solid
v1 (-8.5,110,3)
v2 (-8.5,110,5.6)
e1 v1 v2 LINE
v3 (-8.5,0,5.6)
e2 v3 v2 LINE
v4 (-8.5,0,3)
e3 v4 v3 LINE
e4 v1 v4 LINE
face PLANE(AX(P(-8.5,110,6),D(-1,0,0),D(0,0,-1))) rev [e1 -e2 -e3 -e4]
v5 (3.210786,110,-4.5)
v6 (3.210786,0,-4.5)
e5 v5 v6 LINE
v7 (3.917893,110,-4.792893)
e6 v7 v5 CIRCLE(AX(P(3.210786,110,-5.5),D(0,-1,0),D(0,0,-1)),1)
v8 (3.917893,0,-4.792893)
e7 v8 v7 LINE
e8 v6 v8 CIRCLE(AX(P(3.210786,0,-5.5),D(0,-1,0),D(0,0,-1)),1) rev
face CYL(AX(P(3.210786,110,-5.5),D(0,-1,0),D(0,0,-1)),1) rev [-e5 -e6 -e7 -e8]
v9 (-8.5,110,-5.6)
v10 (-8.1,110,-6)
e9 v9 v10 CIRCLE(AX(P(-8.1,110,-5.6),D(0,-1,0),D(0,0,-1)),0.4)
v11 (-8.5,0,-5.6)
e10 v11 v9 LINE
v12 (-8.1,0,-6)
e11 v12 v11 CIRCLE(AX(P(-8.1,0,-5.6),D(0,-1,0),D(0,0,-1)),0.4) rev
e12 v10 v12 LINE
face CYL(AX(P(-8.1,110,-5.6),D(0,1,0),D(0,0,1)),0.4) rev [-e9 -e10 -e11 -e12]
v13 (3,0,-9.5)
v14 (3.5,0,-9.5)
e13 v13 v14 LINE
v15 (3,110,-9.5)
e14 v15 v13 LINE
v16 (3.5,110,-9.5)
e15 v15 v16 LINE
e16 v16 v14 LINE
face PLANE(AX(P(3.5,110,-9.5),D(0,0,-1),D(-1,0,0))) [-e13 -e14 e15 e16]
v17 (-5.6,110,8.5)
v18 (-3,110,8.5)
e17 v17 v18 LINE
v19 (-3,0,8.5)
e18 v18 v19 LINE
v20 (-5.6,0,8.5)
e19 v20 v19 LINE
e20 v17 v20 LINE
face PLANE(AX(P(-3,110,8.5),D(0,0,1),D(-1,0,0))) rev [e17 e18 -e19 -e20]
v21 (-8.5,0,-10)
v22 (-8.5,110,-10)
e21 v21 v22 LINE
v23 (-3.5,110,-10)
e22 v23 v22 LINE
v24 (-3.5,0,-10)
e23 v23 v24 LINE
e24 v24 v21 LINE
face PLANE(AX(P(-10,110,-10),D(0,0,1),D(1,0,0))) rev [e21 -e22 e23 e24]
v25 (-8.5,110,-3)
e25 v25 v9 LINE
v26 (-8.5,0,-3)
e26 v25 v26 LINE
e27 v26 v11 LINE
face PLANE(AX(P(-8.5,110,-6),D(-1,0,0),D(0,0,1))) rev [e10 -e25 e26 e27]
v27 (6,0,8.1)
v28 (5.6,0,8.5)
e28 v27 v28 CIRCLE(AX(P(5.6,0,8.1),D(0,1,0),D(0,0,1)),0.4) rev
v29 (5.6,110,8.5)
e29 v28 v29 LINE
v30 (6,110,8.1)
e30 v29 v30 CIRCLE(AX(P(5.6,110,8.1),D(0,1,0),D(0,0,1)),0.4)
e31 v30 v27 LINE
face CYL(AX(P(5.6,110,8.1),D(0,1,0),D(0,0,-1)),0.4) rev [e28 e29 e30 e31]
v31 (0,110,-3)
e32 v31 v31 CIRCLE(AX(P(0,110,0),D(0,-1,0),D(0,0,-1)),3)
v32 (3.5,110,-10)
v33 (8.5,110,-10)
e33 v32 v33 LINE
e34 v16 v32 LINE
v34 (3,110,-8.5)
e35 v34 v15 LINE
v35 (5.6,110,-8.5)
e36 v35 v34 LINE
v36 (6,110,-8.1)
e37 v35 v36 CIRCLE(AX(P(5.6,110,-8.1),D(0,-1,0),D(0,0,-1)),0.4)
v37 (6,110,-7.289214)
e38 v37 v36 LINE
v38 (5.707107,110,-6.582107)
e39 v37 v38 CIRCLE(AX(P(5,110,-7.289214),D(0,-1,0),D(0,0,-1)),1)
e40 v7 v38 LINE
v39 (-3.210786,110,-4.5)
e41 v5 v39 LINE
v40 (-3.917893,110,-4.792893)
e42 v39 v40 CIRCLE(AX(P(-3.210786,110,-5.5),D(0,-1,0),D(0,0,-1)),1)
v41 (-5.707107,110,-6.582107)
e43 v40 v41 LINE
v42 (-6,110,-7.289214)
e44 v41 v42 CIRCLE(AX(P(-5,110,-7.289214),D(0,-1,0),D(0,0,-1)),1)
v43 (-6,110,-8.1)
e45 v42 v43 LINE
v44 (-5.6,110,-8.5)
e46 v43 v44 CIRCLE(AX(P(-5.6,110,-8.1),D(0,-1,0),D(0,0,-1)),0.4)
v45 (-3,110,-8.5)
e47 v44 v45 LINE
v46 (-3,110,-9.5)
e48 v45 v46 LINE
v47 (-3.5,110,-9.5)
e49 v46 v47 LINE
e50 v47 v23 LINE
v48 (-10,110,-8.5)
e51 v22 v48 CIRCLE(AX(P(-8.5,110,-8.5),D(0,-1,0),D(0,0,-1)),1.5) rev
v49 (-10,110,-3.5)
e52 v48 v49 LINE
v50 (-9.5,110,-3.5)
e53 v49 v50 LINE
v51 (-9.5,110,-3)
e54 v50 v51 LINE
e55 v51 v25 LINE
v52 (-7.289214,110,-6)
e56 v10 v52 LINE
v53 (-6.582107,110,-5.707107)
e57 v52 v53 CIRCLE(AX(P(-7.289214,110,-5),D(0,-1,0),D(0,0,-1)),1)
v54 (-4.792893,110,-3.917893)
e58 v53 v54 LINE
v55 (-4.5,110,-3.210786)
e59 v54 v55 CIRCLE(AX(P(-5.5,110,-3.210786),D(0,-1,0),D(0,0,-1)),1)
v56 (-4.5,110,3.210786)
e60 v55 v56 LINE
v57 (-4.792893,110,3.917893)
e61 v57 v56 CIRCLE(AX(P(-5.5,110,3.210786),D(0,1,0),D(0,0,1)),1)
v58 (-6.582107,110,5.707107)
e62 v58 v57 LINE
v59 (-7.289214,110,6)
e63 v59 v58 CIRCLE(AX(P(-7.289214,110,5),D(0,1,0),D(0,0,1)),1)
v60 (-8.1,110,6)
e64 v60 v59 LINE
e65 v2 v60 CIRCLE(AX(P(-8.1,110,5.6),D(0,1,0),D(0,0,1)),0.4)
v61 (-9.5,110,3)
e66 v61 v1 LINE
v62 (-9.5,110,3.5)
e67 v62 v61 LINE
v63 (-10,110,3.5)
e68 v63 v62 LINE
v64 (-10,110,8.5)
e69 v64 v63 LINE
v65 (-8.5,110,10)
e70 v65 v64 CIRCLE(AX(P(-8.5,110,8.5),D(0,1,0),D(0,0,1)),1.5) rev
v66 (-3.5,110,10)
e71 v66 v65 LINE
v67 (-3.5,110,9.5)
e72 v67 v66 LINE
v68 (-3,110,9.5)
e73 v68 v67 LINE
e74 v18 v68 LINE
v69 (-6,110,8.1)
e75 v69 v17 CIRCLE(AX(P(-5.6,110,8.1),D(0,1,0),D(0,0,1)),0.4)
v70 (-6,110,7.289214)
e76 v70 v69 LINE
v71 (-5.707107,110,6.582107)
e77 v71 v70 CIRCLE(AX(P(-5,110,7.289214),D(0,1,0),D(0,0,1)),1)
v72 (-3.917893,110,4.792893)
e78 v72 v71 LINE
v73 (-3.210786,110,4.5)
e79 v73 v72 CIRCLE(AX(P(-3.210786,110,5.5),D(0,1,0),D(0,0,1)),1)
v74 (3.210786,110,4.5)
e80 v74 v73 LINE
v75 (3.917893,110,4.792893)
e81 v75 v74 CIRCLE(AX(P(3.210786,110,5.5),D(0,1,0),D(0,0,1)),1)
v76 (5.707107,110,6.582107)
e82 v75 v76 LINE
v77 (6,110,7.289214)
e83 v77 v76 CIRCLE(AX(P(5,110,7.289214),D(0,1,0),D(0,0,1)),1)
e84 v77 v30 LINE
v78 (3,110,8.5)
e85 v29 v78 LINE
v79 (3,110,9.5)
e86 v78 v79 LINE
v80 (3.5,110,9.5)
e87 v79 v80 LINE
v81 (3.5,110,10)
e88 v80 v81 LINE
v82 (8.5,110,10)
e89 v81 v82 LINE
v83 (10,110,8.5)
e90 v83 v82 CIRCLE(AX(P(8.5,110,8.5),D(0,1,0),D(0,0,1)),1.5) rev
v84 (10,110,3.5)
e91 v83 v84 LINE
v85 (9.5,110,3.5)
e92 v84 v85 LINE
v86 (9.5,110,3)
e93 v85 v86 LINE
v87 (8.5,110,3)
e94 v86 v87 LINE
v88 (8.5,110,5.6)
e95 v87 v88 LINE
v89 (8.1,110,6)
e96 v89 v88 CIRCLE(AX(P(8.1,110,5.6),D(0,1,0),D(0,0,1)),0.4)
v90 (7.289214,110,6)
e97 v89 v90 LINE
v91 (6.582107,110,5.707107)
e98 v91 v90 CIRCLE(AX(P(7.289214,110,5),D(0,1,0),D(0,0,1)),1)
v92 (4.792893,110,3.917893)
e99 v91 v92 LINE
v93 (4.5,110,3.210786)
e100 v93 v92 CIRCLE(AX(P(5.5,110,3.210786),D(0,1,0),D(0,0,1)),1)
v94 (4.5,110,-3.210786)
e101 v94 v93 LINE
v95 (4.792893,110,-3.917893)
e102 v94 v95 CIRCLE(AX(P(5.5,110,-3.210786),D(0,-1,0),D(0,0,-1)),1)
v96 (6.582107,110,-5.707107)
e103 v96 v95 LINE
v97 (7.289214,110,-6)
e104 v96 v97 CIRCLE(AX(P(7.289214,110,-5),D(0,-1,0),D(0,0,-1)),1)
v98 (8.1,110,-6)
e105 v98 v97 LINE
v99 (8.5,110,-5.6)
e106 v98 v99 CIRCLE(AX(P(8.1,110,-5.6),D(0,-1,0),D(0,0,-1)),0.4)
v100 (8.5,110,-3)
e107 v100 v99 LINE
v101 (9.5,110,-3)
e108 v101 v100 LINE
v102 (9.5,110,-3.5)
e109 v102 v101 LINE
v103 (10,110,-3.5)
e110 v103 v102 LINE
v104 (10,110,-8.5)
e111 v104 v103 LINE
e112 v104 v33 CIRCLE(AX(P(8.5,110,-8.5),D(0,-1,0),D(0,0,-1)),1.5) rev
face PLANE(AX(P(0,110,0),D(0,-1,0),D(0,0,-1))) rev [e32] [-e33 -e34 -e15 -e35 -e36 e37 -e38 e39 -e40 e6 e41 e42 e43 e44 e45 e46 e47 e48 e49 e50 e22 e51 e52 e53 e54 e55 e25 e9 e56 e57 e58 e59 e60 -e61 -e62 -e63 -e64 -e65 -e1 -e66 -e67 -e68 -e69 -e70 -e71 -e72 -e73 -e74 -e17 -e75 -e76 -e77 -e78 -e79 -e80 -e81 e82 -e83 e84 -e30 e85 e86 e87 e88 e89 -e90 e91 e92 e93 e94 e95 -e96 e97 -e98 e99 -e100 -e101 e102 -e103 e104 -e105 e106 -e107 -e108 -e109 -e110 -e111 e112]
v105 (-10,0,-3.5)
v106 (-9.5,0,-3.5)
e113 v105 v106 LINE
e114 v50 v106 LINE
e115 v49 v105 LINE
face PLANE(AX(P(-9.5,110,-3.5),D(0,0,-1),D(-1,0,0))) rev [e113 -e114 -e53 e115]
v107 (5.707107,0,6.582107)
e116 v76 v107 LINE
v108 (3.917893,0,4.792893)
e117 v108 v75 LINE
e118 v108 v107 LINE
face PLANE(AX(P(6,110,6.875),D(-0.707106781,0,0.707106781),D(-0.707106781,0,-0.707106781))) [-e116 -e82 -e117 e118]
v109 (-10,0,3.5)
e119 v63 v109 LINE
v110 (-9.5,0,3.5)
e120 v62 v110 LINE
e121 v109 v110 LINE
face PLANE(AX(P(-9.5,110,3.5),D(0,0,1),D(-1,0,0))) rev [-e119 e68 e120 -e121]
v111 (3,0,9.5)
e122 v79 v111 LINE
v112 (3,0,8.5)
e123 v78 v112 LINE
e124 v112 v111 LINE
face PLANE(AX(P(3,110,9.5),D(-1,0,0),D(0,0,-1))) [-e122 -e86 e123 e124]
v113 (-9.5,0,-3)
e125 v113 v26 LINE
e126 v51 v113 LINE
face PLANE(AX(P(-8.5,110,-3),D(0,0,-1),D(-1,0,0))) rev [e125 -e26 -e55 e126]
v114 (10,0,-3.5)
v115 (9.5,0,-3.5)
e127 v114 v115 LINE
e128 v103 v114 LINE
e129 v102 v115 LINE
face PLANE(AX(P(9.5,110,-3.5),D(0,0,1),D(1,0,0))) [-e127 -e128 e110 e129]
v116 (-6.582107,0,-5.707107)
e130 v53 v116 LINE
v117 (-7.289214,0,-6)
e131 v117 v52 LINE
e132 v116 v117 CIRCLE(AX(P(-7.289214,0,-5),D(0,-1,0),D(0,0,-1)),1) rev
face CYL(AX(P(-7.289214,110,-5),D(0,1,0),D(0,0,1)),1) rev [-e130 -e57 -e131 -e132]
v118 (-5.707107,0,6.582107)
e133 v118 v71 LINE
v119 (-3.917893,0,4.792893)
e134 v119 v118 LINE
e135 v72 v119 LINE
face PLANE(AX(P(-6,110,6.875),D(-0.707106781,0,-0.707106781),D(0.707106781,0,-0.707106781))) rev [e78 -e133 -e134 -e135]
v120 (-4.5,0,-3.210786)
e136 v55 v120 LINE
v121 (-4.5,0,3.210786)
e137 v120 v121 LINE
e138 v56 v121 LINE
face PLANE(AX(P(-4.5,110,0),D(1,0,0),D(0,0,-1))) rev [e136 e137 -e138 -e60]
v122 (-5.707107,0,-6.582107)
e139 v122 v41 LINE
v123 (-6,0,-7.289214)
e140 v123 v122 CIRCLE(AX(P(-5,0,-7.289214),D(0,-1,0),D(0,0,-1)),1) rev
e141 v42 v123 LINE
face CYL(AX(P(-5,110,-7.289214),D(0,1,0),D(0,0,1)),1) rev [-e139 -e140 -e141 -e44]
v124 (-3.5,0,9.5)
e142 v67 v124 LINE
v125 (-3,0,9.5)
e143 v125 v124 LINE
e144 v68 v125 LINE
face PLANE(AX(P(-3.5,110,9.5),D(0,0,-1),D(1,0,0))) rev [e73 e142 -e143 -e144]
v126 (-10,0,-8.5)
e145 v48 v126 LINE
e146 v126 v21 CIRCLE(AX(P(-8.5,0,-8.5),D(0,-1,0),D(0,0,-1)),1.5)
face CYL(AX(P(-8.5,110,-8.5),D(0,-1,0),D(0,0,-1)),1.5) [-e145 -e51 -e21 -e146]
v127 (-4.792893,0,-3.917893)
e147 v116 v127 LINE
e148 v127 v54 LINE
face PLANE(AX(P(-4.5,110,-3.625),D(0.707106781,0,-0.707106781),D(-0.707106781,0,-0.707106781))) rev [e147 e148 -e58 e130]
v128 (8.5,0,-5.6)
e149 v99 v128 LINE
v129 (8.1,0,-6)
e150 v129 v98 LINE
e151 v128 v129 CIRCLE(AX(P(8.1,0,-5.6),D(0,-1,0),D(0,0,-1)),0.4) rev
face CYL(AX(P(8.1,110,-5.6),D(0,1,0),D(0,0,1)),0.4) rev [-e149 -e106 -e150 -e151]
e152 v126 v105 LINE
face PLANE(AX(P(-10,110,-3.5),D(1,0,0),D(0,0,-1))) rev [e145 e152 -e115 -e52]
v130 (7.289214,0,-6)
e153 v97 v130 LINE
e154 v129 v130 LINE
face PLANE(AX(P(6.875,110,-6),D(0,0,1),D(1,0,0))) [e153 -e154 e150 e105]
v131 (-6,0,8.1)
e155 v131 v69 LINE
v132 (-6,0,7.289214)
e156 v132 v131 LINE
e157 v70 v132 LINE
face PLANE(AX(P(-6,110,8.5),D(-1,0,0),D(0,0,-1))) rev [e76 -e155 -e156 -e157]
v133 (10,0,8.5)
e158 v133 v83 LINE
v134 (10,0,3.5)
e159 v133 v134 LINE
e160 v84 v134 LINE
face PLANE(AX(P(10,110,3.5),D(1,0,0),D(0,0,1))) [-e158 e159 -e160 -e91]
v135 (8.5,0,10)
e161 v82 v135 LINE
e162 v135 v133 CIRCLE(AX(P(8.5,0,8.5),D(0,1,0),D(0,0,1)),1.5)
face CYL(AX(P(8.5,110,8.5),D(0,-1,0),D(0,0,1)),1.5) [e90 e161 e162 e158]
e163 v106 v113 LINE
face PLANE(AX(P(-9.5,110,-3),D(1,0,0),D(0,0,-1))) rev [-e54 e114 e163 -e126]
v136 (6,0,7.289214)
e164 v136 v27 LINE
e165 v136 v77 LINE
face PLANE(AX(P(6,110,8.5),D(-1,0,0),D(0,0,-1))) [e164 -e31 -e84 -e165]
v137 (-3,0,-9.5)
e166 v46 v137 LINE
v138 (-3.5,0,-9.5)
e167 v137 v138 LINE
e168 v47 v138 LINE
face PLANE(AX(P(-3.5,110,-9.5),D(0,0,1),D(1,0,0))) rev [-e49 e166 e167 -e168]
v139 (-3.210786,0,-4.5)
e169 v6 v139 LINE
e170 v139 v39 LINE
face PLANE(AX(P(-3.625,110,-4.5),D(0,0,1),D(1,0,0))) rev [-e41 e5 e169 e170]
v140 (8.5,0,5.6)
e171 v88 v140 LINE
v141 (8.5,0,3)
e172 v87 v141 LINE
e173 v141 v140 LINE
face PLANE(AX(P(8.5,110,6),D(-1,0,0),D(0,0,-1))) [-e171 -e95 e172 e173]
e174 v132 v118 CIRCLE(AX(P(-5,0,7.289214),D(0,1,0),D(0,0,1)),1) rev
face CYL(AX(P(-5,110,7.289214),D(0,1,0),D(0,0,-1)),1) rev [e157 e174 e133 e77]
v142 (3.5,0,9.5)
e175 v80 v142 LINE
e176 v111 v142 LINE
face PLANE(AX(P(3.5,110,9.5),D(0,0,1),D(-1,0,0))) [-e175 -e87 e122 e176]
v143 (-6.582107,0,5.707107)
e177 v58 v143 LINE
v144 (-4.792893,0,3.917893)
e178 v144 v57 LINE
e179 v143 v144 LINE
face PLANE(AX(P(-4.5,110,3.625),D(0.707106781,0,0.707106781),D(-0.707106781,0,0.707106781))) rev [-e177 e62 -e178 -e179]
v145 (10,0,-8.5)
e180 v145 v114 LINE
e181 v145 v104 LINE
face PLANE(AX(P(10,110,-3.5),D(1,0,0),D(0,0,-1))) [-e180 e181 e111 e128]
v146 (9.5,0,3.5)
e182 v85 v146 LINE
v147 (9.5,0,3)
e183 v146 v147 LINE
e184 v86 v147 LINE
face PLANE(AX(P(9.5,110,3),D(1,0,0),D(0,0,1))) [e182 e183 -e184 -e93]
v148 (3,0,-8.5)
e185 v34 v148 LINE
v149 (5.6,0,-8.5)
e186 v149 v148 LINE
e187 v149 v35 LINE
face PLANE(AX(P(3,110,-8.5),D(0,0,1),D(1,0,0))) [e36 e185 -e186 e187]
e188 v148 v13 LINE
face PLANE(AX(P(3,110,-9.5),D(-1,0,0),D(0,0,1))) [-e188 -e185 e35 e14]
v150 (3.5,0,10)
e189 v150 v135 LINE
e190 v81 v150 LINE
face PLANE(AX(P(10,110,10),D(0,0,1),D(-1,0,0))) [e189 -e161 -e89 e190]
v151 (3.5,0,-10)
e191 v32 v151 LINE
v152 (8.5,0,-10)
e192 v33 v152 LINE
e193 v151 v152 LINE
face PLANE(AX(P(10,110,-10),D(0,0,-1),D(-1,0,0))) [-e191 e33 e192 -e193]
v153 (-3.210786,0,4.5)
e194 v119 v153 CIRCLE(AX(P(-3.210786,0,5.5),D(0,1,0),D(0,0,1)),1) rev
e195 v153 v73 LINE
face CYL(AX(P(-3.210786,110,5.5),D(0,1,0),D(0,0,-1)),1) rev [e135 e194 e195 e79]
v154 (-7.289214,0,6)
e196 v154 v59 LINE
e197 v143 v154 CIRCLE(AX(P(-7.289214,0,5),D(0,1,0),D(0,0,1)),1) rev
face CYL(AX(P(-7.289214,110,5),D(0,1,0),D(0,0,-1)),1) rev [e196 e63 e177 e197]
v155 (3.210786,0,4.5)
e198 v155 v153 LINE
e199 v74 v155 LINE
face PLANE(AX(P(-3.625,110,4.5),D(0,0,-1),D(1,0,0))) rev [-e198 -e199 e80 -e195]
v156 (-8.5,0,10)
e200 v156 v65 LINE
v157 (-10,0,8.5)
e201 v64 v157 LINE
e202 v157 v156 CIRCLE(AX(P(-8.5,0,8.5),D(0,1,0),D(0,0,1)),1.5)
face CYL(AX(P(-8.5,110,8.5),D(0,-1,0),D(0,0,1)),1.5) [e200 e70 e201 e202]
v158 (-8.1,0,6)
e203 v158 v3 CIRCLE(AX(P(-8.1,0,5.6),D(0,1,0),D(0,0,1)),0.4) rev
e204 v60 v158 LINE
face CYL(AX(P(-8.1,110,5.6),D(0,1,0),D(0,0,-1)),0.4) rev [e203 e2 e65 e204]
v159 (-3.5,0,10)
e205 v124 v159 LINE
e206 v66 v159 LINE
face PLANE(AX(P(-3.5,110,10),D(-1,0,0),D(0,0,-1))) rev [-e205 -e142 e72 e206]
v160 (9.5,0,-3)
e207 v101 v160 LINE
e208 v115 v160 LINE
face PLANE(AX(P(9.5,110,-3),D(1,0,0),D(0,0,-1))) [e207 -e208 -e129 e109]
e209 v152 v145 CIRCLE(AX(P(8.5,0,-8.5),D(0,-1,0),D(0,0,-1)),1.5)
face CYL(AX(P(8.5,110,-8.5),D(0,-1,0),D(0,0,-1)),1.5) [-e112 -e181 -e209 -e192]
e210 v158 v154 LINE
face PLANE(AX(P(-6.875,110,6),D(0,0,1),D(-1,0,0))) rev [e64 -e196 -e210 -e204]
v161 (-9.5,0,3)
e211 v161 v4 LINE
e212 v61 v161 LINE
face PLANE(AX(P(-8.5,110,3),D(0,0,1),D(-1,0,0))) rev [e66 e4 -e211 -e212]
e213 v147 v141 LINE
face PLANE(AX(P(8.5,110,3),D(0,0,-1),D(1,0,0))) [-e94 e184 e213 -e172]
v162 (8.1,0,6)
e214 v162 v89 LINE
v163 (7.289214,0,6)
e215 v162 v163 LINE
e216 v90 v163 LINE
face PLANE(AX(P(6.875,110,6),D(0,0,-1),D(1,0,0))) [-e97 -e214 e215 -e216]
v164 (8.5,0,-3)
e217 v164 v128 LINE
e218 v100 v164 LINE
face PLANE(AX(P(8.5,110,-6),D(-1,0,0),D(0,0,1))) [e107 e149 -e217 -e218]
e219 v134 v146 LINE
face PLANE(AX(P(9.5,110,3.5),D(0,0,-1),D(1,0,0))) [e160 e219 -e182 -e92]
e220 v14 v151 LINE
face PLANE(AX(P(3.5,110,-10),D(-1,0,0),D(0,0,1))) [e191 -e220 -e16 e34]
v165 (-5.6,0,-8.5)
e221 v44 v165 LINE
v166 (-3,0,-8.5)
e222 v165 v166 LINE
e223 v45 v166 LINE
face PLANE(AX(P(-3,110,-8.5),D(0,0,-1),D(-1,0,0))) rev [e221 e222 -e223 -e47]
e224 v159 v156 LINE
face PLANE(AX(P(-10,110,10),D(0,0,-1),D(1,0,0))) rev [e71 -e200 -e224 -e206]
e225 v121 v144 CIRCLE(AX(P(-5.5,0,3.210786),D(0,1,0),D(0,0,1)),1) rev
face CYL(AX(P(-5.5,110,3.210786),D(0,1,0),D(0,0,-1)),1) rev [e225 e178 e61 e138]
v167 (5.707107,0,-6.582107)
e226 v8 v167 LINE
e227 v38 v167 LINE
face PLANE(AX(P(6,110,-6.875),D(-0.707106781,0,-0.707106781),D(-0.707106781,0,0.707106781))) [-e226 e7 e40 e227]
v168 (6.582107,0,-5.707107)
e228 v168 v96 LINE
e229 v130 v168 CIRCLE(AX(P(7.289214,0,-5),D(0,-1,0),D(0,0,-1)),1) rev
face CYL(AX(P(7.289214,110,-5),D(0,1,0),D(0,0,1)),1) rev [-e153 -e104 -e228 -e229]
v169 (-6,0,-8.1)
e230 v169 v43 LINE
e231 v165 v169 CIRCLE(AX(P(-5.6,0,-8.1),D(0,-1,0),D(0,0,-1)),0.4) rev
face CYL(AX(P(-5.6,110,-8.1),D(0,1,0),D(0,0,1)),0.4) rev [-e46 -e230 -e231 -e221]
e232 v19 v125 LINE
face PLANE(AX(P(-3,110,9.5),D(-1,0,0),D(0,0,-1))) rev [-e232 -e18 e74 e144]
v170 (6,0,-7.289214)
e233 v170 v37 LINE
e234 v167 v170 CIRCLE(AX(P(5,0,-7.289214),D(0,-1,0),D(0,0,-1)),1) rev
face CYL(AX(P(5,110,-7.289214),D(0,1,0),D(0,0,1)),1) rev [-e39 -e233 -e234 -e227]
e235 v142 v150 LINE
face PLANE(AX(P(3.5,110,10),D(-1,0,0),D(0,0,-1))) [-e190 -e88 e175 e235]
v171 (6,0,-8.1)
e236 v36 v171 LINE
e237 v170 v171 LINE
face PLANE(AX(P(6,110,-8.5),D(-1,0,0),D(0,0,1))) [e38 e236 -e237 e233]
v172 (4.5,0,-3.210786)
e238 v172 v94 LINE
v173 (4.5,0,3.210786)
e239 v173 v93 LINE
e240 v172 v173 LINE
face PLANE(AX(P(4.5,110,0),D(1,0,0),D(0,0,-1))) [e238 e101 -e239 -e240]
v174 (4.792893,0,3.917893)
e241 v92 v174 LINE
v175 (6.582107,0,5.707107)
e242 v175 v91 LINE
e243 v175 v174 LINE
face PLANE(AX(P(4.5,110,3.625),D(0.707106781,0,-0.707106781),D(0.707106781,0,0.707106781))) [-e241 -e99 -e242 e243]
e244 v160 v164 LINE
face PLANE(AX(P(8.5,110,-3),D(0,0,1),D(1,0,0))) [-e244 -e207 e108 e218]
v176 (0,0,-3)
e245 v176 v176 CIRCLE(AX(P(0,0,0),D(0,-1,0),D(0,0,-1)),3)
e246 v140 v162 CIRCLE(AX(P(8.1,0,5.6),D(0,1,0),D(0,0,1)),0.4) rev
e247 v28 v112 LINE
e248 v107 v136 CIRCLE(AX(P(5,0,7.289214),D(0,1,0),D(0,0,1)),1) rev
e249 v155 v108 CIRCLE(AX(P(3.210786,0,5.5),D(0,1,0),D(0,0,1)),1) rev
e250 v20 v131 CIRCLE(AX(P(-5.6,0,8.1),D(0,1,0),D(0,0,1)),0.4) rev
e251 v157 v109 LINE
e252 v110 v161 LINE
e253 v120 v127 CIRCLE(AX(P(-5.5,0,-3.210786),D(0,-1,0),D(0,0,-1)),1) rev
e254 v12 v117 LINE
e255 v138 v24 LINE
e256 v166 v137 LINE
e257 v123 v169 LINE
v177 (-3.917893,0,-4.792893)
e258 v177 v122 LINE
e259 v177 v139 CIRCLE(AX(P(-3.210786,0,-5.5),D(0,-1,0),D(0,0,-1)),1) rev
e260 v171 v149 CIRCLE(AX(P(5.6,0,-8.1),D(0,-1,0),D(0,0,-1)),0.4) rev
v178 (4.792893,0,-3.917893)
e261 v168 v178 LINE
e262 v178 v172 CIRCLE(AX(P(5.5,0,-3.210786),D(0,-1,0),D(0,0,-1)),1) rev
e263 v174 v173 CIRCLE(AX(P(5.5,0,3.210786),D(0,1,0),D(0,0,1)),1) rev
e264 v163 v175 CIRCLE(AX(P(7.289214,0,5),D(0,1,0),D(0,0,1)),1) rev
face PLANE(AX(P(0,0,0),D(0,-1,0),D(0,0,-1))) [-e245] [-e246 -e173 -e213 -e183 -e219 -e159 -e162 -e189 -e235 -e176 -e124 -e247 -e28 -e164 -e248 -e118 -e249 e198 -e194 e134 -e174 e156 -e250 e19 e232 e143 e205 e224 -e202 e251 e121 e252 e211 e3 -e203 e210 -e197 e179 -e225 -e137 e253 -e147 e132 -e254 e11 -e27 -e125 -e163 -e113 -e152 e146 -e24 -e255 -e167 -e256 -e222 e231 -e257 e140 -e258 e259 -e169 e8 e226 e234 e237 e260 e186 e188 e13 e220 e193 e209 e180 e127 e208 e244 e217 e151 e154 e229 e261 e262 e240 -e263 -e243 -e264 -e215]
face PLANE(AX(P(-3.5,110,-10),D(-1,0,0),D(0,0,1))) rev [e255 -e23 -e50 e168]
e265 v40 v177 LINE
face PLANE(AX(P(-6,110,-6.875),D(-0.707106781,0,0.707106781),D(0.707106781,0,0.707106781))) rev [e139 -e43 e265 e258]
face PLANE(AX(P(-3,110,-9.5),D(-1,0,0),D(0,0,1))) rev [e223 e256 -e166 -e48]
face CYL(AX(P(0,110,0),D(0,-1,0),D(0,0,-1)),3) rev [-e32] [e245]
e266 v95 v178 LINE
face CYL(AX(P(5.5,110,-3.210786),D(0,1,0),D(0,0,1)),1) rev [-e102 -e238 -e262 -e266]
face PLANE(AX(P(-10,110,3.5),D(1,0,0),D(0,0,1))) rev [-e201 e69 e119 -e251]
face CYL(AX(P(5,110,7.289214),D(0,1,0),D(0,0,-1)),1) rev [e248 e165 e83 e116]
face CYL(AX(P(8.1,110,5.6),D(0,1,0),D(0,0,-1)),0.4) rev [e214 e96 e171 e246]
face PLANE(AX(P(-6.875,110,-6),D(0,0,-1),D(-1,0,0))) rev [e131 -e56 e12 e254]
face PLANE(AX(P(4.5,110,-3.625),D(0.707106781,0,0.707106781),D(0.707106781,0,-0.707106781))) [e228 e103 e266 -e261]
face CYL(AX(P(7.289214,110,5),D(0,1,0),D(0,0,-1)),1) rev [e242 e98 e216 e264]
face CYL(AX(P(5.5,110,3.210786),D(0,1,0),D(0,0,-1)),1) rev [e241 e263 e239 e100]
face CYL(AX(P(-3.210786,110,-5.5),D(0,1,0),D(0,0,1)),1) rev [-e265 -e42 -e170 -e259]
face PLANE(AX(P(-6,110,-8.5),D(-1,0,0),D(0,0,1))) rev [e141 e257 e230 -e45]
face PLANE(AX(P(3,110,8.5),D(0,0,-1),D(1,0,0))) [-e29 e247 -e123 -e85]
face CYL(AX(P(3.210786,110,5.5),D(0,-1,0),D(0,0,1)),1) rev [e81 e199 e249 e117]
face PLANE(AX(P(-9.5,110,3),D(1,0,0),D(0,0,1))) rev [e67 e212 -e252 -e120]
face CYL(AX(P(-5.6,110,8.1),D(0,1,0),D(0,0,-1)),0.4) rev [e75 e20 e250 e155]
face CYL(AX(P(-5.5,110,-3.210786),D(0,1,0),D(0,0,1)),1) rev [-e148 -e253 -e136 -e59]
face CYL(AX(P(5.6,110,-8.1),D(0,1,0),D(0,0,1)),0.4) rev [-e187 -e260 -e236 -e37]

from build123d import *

# Parameters (mm, degrees)
BOSS_EXTRU_1_CORPS_DEPTH    = 110
CONG_1_R                    = 1.5
CONG_2_R                    = 0.4
CONG_4_R                    = 1
CONG_1_OF_SYM_TRIE_BRAS_R   = 1.5
CONG_2_OF_SYM_TRIE_BRAS_R   = 0.4
CONG_4_OF_SYM_TRIE_BRAS_R   = 1
SYM_TRIE_BRAS_DOUBLE_DEPTH  = 110
APR_S_TARODAGE_M6_R         = 3
ENL_V_MAT_FILETAGE_M6_DEPTH = 111.905365064


# Read off the part's stored shape, not the designer's step: Symétrie Bras double
with BuildPart() as part:
    # Esquisse4 → Boss.-Extru.1 Corps (new body)
    with BuildSketch(Plane(origin=(0, 0, 0), x_dir=(1, 0, 0), z_dir=(0, 1, 0))):
        Polygon((0, 0), (-4.5, 0), (-4.5, 3.625), (-6.875, 6), (-8.5, 6), (-8.5, 3), (-9.5, 3), (-9.5, 3.5), (-10, 3.5), (-10, 10), (-3.5, 10), (-3.5, 9.5), (-3, 9.5), (-3, 8.5), (-6, 8.5), (-6, 6.875), (-3.625, 4.5), (0, 4.5), align=None)
    boss_extru_1_corps = extrude(amount=BOSS_EXTRU_1_CORPS_DEPTH)

    # Congé1
    cong_1_edges = [part.edges().sort_by_distance(p)[0] for p in [
        (-10, 55, -10),
    ]]
    fillet(cong_1_edges, radius=CONG_1_R)

    # Congé2
    cong_2_edges = [part.edges().sort_by_distance(p)[0] for p in [
        (-8.5, 55, -6),
        (-6, 55, -8.5),
    ]]
    fillet(cong_2_edges, radius=CONG_2_R)

    # Congé4
    cong_4_edges = [part.edges().sort_by_distance(p)[0] for p in [
        (-4.5, 55, -3.625),
        (-6.875, 55, -6),
        (-6, 55, -6.875),
        (-3.625, 55, -4.5),
    ]]
    fillet(cong_4_edges, radius=CONG_4_R)

    # Symétrie Bras: Boss.-Extru.1 Corps across plane
    add(boss_extru_1_corps.mirror(Plane(origin=(0, 110, -4.5), x_dir=(0, 0, 1), z_dir=(-1, 0, 0))))

    # Congé1 of Symétrie Bras
    cong_1_of_sym_trie_bras_edges = [part.edges().sort_by_distance(p)[0] for p in [
        (10, 55, -10),
    ]]
    fillet(cong_1_of_sym_trie_bras_edges, radius=CONG_1_OF_SYM_TRIE_BRAS_R)

    # Congé2 of Symétrie Bras
    cong_2_of_sym_trie_bras_edges = [part.edges().sort_by_distance(p)[0] for p in [
        (8.5, 55, -6),
        (6, 55, -8.5),
    ]]
    fillet(cong_2_of_sym_trie_bras_edges, radius=CONG_2_OF_SYM_TRIE_BRAS_R)

    # Congé4 of Symétrie Bras
    cong_4_of_sym_trie_bras_edges = [part.edges().sort_by_distance(p)[0] for p in [
        (4.5, 55, -3.625),
        (6.875, 55, -6),
        (6, 55, -6.875),
        (3.625, 55, -4.5),
    ]]
    fillet(cong_4_of_sym_trie_bras_edges, radius=CONG_4_OF_SYM_TRIE_BRAS_R)

    # Symétrie Bras double outline → Symétrie Bras double (add)
    with BuildSketch(Plane(origin=(0, 0, 0), x_dir=(1, 0, 0), z_dir=(0, 1, 0))):
        with BuildLine():
            ThreePointArc((7.289213562, -6), (6.90653013, -5.923879533), (6.582106781, -5.707106781))
            Line((6.582106781, -5.707106781), (4.792893219, -3.917893219))
            ThreePointArc((4.792893219, -3.917893219), (4.576120467, -3.59346987), (4.5, -3.210786438))
            Line((4.5, -3.210786438), (4.5, 0))
            Line((4.5, 0), (-4.5, 0))
            Line((-4.5, 0), (-4.5, -3.210786438))
            ThreePointArc((-4.5, -3.210786438), (-4.576120467, -3.59346987), (-4.792893219, -3.917893219))
            Line((-4.792893219, -3.917893219), (-6.582106781, -5.707106781))
            ThreePointArc((-6.582106781, -5.707106781), (-6.90653013, -5.923879533), (-7.289213562, -6))
            Line((-7.289213562, -6), (-8.1, -6))
            ThreePointArc((-8.1, -6), (-8.382842712, -5.882842712), (-8.5, -5.6))
            Line((-8.5, -5.6), (-8.5, -3))
            Line((-8.5, -3), (-9.5, -3))
            Line((-9.5, -3), (-9.5, -3.5))
            Line((-9.5, -3.5), (-10, -3.5))
            Line((-10, -3.5), (-10, -8.5))
            ThreePointArc((-10, -8.5), (-9.560660172, -9.560660172), (-8.5, -10))
            Line((-8.5, -10), (-3.5, -10))
            Line((-3.5, -10), (-3.5, -9.5))
            Line((-3.5, -9.5), (-3, -9.5))
            Line((-3, -9.5), (-3, -8.5))
            Line((-3, -8.5), (-5.6, -8.5))
            ThreePointArc((-5.6, -8.5), (-5.882842712, -8.382842712), (-6, -8.1))
            Line((-6, -8.1), (-6, -7.289213562))
            ThreePointArc((-6, -7.289213562), (-5.923879533, -6.90653013), (-5.707106781, -6.582106781))
            Line((-5.707106781, -6.582106781), (-3.917893219, -4.792893219))
            ThreePointArc((-3.917893219, -4.792893219), (-3.59346987, -4.576120467), (-3.210786438, -4.5))
            Line((-3.210786438, -4.5), (3.210786438, -4.5))
            ThreePointArc((3.210786438, -4.5), (3.59346987, -4.576120467), (3.917893219, -4.792893219))
            Line((3.917893219, -4.792893219), (5.707106781, -6.582106781))
            ThreePointArc((5.707106781, -6.582106781), (5.923879533, -6.90653013), (6, -7.289213562))
            Line((6, -7.289213562), (6, -8.1))
            ThreePointArc((6, -8.1), (5.882842712, -8.382842712), (5.6, -8.5))
            Line((5.6, -8.5), (3, -8.5))
            Line((3, -8.5), (3, -9.5))
            Line((3, -9.5), (3.5, -9.5))
            Line((3.5, -9.5), (3.5, -10))
            Line((3.5, -10), (8.5, -10))
            ThreePointArc((8.5, -10), (9.560660172, -9.560660172), (10, -8.5))
            Line((10, -8.5), (10, -3.5))
            Line((10, -3.5), (9.5, -3.5))
            Line((9.5, -3.5), (9.5, -3))
            Line((9.5, -3), (8.5, -3))
            Line((8.5, -3), (8.5, -5.6))
            ThreePointArc((8.5, -5.6), (8.382842712, -5.882842712), (8.1, -6))
            Line((8.1, -6), (7.289213562, -6))
        make_face()
    extrude(amount=SYM_TRIE_BRAS_DOUBLE_DEPTH)

    # Après tarodage M6 → Enlèv. mat.-Filetage M6 (cut, through all)
    with BuildSketch(Plane.XZ):
        with Locations(Location((0, 0, 0), (0, 0, 270))):
            Circle(APR_S_TARODAGE_M6_R)
    extrude(amount=-ENL_V_MAT_FILETAGE_M6_DEPTH, mode=Mode.SUBTRACT)


solid = part.part
